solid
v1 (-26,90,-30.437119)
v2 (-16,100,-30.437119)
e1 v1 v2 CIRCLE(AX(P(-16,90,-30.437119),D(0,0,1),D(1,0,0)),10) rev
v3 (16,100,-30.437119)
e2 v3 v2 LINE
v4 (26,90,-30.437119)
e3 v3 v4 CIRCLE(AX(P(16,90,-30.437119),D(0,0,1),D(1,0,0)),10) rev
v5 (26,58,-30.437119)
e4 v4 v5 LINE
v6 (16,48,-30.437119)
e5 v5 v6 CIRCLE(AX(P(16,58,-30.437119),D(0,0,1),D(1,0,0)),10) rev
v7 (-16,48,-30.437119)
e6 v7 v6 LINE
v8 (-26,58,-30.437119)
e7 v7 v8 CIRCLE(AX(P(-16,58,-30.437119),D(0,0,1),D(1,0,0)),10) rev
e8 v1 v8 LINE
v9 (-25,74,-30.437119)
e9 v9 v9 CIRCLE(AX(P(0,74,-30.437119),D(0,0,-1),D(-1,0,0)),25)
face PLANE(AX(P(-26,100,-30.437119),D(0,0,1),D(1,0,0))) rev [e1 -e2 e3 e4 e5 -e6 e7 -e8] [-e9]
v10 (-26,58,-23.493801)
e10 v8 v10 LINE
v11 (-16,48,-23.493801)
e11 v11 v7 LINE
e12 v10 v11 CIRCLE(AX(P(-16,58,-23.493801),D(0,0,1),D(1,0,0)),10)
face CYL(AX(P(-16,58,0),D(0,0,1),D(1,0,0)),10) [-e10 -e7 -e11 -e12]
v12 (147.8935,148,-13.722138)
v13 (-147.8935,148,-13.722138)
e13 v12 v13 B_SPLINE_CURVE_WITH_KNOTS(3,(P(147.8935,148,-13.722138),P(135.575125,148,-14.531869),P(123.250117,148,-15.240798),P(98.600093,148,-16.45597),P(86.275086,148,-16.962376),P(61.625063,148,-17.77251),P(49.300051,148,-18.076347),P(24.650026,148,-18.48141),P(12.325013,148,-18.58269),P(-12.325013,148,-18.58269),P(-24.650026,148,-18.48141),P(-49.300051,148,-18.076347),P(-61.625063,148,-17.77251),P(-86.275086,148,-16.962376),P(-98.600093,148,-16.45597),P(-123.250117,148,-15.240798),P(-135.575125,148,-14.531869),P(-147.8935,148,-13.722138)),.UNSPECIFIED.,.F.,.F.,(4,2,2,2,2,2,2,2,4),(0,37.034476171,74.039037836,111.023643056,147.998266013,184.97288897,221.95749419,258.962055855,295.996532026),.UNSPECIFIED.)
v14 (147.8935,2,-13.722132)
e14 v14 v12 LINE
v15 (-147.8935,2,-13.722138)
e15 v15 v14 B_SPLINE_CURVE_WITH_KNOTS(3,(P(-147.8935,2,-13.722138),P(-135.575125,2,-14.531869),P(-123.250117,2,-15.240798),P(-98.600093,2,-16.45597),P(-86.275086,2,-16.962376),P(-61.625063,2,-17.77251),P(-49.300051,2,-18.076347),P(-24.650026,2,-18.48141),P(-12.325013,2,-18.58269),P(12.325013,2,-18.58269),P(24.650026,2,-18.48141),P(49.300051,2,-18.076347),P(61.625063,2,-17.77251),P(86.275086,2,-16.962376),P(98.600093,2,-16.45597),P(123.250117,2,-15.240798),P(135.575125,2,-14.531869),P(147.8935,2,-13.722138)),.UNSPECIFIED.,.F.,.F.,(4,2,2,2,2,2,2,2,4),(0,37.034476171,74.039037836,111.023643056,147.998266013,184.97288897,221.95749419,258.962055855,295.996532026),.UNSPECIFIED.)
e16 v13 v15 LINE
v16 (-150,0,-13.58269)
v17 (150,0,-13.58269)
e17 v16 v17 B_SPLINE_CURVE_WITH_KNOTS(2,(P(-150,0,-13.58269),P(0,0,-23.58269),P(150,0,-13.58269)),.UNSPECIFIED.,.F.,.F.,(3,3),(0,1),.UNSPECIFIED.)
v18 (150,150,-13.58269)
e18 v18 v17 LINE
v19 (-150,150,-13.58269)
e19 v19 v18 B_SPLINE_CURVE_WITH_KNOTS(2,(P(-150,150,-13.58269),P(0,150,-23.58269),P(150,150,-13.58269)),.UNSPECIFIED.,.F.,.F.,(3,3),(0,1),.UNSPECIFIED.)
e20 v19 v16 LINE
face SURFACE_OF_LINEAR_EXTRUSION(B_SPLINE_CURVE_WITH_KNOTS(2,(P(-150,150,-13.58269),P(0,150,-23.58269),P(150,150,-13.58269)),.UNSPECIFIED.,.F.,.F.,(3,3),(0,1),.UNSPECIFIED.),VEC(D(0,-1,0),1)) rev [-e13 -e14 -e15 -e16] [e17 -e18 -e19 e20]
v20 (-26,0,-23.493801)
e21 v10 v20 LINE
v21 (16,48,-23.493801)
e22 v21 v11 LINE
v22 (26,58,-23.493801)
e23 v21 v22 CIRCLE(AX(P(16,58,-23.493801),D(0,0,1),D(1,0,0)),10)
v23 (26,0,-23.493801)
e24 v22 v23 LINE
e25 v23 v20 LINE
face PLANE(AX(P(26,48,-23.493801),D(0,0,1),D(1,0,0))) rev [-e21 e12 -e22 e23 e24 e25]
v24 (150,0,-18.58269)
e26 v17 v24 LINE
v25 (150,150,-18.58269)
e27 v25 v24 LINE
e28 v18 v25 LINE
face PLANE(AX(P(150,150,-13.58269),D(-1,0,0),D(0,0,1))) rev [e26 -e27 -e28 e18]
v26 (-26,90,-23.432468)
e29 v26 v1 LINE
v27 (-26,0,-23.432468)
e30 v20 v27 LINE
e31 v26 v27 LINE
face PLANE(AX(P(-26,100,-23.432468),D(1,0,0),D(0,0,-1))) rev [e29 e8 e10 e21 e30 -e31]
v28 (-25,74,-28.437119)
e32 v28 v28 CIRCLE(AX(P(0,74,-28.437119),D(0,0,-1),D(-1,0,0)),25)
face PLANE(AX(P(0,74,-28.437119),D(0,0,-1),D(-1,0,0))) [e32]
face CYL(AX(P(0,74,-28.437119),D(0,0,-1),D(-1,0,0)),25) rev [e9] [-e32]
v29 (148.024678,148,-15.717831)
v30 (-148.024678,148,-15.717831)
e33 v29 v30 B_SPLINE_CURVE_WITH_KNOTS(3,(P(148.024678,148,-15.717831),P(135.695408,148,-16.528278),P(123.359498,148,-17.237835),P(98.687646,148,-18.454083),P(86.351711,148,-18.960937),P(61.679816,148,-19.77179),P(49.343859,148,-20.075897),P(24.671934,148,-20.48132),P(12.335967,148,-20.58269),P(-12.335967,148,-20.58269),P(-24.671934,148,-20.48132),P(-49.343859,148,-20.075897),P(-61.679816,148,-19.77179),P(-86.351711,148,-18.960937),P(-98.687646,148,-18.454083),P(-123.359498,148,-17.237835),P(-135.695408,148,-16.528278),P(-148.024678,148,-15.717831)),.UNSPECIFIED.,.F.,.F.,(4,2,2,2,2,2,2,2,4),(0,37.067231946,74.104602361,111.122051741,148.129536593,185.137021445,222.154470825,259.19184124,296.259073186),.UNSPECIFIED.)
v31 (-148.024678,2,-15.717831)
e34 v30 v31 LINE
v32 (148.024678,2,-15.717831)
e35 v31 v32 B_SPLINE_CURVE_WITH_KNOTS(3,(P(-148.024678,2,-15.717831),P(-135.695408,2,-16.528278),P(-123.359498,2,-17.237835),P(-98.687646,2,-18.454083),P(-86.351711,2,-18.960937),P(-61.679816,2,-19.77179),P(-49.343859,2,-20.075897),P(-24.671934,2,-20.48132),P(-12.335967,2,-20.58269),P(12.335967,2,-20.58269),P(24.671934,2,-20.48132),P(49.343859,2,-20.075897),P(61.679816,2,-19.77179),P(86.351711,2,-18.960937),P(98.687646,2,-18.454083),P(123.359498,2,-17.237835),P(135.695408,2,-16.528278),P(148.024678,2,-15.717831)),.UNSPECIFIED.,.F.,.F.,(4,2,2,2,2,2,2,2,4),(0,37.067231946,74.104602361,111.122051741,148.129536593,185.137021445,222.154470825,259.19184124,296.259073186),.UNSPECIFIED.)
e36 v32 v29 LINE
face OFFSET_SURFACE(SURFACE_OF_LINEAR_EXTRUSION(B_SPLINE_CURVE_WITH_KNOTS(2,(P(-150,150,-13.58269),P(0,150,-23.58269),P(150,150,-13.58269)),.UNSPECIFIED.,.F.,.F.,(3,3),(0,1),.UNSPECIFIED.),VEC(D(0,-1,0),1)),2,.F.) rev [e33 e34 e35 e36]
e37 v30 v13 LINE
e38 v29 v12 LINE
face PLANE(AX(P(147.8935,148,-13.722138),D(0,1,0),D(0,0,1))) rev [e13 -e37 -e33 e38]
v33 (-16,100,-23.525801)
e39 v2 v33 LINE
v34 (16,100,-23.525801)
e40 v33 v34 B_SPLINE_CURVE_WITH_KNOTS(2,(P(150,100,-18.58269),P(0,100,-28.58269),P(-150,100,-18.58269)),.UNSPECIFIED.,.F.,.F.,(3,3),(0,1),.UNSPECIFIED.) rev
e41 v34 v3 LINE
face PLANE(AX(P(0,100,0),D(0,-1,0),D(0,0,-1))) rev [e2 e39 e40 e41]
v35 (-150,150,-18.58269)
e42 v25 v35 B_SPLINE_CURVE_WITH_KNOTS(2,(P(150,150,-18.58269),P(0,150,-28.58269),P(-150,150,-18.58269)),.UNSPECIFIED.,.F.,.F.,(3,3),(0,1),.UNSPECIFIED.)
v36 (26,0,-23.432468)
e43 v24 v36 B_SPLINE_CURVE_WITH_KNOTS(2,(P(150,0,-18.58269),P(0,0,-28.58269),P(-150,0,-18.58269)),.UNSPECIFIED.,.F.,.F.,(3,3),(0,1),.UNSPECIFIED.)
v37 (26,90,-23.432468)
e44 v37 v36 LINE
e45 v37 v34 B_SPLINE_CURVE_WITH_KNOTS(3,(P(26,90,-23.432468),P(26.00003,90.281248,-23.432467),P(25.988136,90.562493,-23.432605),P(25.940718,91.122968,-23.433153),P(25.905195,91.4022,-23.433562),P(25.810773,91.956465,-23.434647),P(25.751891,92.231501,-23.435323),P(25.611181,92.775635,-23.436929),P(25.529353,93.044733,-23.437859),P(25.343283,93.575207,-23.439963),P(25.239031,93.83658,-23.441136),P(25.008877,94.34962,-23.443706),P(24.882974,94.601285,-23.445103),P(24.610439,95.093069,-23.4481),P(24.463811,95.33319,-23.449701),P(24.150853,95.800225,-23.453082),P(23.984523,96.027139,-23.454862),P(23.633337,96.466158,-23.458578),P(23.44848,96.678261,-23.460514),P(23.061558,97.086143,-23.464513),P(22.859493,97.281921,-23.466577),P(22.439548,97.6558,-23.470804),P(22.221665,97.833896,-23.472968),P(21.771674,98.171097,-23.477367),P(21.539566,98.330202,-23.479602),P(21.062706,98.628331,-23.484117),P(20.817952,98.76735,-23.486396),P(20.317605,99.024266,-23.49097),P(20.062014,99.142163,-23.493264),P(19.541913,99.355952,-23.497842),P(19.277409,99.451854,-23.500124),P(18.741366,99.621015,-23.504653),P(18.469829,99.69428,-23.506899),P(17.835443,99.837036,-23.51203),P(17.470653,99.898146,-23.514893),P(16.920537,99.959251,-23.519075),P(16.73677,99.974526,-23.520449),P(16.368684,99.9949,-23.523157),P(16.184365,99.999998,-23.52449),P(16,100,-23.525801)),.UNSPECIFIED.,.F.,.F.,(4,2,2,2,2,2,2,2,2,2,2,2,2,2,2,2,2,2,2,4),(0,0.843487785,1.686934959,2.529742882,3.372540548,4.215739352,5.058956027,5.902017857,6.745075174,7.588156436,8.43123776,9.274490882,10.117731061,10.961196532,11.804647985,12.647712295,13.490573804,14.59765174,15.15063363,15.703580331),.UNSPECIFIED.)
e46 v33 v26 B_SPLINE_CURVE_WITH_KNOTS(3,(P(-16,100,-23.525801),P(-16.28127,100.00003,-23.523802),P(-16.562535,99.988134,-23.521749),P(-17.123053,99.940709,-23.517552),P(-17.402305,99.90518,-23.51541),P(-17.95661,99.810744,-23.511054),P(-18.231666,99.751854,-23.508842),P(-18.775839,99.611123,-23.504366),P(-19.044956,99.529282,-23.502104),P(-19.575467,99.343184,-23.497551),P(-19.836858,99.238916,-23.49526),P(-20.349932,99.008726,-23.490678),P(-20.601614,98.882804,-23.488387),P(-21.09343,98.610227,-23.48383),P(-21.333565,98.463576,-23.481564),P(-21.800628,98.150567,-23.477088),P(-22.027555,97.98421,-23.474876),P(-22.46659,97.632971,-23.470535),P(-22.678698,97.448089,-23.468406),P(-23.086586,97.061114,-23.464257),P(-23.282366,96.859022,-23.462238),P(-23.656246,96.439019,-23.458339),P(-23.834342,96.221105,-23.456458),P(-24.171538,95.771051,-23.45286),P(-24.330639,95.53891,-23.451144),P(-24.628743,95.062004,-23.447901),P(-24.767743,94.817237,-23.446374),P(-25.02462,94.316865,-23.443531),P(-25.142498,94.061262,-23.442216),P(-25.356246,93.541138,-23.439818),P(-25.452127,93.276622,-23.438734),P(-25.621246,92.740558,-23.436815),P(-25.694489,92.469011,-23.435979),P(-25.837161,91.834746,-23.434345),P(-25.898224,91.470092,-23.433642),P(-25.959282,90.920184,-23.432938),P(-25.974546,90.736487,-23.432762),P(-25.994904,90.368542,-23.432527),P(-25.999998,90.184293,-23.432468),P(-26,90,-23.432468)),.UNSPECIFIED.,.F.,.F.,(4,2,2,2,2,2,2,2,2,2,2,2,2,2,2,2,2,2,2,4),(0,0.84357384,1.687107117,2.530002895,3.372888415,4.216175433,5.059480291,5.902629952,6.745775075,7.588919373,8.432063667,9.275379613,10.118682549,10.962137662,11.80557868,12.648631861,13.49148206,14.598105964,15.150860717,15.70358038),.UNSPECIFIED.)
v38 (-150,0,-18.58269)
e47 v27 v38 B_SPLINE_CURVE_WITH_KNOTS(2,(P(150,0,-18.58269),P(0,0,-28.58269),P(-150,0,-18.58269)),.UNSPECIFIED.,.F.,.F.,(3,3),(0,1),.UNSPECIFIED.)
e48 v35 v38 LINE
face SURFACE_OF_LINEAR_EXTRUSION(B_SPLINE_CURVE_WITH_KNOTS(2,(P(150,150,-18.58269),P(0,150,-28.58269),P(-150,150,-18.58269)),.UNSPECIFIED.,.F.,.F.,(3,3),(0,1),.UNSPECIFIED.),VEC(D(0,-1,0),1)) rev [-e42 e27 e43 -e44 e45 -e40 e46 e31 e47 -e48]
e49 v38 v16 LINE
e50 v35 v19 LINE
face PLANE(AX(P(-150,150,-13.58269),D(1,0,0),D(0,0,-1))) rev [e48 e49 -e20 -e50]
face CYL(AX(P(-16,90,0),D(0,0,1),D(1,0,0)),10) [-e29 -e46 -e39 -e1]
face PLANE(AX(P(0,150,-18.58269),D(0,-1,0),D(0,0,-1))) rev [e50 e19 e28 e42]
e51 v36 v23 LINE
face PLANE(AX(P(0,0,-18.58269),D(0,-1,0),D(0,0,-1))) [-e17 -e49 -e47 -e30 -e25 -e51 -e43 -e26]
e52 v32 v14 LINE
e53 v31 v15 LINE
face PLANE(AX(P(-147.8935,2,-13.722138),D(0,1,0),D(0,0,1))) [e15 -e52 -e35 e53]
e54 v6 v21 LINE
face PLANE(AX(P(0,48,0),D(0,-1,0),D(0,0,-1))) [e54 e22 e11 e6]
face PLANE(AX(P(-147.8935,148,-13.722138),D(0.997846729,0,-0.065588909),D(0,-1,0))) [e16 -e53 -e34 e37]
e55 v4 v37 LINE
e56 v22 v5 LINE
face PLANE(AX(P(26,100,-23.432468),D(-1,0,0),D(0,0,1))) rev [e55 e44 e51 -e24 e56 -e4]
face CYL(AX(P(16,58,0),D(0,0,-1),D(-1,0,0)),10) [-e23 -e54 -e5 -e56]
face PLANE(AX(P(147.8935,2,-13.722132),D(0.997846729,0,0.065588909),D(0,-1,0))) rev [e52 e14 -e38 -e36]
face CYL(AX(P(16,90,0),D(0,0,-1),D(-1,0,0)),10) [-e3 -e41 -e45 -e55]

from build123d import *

# Parameters (mm, degrees)
BOSS_EXTRUDE1_DEPTH = 150
WRAP1_START         = 2
WRAP1_DEPTH         = 146
SKETCH5_W           = 52
SKETCH5_H           = 7.004650575
BOSS_EXTRUDE2_DEPTH = 100
SKETCH6_W           = 52
SKETCH6_H           = 6.943317242
CUT_EXTRUDE1_DEPTH  = 48
SKETCH7_R           = 25
CUT_EXTRUDE7_DEPTH  = 2
FILLET1_R           = 10


# Read off the part's stored shape, not the designer's step: Wrap1
with BuildPart() as part:
    # Sketch1 → Boss-Extrude1 (new body)
    with BuildSketch(Plane(origin=(0, 0, 0), x_dir=(1, 0, 0), z_dir=(0, 1, 0))):
        with BuildLine():
            Line((150, 13.582690372), (150, 18.582690372))
            add(Edge.make_bspline(
                [(150, 18.582690372), (0, 28.582690372), (-150, 18.582690372)],
                knots=[0, 0, 0, 1, 1, 1], degree=2))
            Line((-150, 18.582690372), (-150, 13.582690372))
            add(Edge.make_bspline(
                [(150, 13.582690372), (0, 23.582690372), (-150, 13.582690372)],
                knots=[0, 0, 0, 1, 1, 1], degree=2))
        make_face()
    extrude(amount=BOSS_EXTRUDE1_DEPTH)

    # Wrap1 outline → Wrap1 (cut)
    with BuildSketch(Plane(origin=(0, 0, 0), x_dir=(1, 0, 0), z_dir=(0, 1, 0)).offset(WRAP1_START)):
        with BuildLine():
            add(Edge.make_bspline(
                [(-148.024677757, 15.717831092), (-74.012620983, 20.582676475), (1e-09, 22.204328649), (74.012620985, 20.582676475), (148.024677759, 15.717831092)],
                knots=[0.007021667, 0.007021667, 0.007021667, 0.007021667, 0.007021667, 0.992978333, 0.992978333, 0.992978333, 0.992978333, 0.992978333], degree=4))
            Line((-148.024677757, 15.717831092), (-147.89349994, 13.722137634))
            add(Edge.make_bspline(
                [(-147.89349994, 13.722137634), (0, 23.443243111), (147.89349994, 13.722137634)],
                knots=[0.007021667, 0.007021667, 0.007021667, 0.992978333, 0.992978333, 0.992978333], degree=2))
            Line((147.89349994, 13.722137634), (148.024677759, 15.717831092))
        make_face()
    extrude(amount=WRAP1_DEPTH, mode=Mode.SUBTRACT)

    # Sketch5 → Boss-Extrude2 (add)
    with BuildSketch(Plane(origin=(0, 0, 0), x_dir=(1, 0, 0), z_dir=(0, 1, 0))):
        with Locations((0, 26.934793438)):
            Rectangle(SKETCH5_W, SKETCH5_H)
    extrude(amount=BOSS_EXTRUDE2_DEPTH)

    # Sketch6 → Cut-Extrude1 (cut)
    with BuildSketch(Plane.XZ):
        with Locations((0, -26.965460104)):
            Rectangle(SKETCH6_W, SKETCH6_H)
    extrude(amount=-CUT_EXTRUDE1_DEPTH, mode=Mode.SUBTRACT)

    # Sketch7 → Cut-Extrude7 (cut)
    with BuildSketch(Plane(origin=(0, 0, -30.437118725), x_dir=(-1, 0, 0), z_dir=(0, 0, -1))):
        with Locations((0, 74)):
            Circle(SKETCH7_R)
    extrude(amount=-CUT_EXTRUDE7_DEPTH, mode=Mode.SUBTRACT)

    # Fillet1
    fillet1_edges = [part.edges().sort_by_distance(p)[0] for p in [
        (-26, 100, -26.934793437),
        (-26, 48, -26.965460104),
        (26, 48, -26.965460104),
        (26, 100, -26.934793437),
    ]]
    fillet(fillet1_edges, radius=FILLET1_R)


solid = part.part
